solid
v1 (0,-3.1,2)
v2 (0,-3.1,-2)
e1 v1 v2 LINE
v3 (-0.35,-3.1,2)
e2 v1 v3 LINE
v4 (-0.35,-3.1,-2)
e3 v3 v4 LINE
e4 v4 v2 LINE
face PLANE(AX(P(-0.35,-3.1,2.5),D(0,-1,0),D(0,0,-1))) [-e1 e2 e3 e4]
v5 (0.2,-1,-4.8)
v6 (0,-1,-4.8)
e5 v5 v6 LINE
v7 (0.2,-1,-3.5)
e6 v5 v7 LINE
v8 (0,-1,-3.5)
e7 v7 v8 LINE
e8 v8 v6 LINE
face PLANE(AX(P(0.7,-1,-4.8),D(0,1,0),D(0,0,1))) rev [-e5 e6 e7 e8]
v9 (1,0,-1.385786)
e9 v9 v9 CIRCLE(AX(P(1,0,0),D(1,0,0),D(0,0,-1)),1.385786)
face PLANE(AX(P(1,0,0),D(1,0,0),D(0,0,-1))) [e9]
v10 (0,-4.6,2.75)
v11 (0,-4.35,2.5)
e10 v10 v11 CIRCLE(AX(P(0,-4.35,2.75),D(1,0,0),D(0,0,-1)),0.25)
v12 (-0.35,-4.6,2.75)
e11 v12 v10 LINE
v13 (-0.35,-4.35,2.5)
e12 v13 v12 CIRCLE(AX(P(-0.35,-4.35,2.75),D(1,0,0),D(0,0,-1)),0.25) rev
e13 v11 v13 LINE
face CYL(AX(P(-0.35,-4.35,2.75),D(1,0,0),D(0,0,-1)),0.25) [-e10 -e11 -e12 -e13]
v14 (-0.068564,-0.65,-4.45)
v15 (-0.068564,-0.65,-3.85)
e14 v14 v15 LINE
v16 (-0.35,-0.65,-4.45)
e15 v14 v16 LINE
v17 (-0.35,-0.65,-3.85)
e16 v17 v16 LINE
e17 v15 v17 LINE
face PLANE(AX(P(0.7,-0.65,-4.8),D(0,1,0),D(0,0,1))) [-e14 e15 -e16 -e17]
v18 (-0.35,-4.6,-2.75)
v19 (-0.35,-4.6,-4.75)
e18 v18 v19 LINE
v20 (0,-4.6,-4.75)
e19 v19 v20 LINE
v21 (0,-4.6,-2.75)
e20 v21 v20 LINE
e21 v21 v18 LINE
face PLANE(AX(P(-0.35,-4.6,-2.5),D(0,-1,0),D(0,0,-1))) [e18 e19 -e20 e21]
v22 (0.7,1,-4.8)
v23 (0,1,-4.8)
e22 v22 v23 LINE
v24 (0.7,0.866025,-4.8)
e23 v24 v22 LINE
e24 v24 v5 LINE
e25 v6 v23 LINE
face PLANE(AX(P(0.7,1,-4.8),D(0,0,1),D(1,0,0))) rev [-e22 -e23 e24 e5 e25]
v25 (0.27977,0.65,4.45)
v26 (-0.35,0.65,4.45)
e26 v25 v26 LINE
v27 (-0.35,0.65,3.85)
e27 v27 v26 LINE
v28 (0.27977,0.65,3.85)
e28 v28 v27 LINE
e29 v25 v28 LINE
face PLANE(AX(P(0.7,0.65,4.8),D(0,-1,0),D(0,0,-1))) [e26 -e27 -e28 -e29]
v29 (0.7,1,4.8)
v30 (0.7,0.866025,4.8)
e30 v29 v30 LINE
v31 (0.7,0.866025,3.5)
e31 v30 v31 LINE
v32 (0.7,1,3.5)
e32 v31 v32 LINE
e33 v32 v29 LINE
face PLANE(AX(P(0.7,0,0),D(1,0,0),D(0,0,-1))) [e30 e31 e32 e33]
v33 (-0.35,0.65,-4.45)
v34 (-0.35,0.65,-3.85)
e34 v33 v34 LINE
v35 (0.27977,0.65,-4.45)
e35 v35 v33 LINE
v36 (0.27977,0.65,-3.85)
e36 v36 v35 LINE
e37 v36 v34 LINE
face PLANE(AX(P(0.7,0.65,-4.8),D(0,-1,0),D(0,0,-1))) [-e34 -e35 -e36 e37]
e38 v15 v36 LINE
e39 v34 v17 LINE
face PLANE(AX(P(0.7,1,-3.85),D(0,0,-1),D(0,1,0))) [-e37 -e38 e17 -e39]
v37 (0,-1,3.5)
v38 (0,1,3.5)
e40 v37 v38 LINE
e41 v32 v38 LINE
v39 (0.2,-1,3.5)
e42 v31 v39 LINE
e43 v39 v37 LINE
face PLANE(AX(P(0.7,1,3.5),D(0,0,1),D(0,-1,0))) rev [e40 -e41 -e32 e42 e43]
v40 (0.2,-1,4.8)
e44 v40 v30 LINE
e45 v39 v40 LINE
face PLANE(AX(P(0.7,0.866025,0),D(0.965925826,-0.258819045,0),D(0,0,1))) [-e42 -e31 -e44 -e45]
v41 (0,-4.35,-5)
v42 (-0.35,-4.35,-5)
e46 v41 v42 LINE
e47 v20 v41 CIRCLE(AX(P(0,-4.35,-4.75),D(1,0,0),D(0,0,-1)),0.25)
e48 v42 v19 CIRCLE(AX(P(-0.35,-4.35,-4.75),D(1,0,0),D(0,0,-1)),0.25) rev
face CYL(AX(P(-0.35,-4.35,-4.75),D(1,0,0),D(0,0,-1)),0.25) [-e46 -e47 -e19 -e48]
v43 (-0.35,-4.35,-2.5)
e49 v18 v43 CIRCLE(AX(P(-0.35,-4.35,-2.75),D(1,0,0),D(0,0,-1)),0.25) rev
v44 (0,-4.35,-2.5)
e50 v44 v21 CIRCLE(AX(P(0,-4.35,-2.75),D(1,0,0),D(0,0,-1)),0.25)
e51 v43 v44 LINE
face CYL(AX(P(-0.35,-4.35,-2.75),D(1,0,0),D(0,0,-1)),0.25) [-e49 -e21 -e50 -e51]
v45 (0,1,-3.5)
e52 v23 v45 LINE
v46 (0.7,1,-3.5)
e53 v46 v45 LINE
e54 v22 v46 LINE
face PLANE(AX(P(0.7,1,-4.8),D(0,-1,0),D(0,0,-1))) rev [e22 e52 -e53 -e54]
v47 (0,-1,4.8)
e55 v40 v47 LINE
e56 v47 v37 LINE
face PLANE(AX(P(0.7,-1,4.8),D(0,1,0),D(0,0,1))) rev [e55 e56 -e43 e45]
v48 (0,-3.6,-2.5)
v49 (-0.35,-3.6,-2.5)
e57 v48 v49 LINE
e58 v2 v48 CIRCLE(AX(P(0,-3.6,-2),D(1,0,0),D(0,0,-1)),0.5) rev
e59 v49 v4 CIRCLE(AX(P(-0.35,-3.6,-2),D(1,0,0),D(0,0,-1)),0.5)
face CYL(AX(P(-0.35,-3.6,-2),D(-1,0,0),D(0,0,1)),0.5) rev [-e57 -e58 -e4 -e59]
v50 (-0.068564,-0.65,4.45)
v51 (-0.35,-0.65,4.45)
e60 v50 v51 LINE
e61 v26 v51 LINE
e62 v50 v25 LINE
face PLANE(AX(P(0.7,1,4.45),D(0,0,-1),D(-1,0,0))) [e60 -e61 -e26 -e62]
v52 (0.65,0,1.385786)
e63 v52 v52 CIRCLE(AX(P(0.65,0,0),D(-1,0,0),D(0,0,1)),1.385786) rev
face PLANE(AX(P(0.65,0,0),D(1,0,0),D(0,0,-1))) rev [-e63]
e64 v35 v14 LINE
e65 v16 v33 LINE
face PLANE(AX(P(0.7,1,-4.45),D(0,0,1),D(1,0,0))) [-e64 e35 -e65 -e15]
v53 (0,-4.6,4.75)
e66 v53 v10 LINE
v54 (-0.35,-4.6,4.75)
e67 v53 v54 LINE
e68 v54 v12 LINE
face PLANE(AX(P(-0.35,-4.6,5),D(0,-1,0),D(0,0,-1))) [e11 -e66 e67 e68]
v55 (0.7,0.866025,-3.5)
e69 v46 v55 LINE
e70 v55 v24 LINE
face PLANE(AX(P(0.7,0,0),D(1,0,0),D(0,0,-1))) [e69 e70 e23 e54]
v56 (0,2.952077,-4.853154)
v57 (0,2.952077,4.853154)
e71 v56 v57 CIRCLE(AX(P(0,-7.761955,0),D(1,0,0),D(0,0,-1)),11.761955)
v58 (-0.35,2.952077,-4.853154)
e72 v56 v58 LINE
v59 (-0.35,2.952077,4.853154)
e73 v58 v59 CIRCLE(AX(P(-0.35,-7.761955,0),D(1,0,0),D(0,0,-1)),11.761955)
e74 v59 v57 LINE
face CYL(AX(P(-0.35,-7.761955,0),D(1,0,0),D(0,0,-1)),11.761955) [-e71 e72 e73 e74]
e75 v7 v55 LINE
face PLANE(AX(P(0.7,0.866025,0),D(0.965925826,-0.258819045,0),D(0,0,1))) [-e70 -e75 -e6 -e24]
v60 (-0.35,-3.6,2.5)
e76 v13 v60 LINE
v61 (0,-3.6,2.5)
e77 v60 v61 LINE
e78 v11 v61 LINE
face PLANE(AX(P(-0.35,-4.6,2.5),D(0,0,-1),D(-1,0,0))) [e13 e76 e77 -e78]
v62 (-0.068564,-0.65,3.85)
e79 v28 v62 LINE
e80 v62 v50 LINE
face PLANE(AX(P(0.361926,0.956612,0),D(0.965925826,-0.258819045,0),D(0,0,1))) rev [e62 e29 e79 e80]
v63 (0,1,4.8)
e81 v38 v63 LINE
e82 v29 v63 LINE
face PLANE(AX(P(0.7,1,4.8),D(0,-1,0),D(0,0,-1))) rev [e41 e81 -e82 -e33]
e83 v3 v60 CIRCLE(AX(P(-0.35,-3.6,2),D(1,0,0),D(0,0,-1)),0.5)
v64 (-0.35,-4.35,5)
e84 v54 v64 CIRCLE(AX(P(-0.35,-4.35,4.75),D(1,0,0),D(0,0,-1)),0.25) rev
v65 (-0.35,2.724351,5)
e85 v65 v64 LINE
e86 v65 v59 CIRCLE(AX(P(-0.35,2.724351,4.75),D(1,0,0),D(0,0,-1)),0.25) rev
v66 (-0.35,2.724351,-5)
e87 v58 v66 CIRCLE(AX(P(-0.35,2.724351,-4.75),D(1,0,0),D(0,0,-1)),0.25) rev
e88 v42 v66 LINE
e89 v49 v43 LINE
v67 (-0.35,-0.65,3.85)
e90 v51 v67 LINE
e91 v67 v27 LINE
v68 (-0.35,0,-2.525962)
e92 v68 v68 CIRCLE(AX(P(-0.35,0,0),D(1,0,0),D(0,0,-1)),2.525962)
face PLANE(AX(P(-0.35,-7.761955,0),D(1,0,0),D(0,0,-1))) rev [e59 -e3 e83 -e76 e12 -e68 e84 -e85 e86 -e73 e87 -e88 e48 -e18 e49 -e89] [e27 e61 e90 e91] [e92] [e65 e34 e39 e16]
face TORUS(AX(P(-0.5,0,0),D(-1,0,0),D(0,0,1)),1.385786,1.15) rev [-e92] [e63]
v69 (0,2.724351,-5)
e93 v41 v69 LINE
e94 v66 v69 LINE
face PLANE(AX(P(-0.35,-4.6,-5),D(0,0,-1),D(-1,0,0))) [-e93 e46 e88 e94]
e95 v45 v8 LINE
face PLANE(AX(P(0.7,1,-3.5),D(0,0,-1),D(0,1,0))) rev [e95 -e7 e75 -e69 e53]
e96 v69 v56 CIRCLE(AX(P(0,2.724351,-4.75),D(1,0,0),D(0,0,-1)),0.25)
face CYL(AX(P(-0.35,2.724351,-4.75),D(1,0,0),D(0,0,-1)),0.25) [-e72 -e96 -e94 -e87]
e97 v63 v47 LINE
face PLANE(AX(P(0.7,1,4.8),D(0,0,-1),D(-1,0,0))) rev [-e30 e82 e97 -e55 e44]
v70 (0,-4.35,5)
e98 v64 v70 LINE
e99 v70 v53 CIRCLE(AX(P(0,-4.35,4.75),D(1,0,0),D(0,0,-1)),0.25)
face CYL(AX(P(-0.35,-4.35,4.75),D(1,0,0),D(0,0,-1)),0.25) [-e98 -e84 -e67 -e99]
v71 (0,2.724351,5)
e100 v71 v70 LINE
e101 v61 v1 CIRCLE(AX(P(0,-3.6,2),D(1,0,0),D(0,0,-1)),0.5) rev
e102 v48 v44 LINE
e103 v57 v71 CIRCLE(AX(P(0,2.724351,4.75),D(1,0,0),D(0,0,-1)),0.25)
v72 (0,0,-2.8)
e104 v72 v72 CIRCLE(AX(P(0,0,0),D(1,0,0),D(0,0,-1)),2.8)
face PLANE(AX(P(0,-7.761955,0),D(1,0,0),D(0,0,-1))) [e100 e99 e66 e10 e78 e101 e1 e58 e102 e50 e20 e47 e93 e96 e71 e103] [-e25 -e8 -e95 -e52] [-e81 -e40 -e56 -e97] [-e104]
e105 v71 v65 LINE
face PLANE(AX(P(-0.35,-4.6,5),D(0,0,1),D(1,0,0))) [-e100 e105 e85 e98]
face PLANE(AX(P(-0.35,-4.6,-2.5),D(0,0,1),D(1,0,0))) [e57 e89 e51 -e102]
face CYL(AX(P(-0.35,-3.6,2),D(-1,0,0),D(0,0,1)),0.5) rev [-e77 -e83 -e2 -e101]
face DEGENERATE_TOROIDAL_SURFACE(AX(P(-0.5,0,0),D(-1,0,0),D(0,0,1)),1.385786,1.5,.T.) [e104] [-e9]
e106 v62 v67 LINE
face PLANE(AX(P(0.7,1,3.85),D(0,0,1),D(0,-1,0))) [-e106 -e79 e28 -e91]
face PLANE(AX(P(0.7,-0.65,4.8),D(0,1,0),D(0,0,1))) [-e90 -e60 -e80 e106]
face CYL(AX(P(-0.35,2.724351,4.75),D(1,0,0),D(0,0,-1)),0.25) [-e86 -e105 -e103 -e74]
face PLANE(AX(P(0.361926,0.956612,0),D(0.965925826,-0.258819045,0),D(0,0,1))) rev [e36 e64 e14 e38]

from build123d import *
from OCP.BRepFilletAPI import BRepFilletAPI_MakeChamfer

# Parameters (mm, degrees)
SKETCH1_R           = 2.8
BOSS_EXTRUDE1_DEPTH = 1
BOSS_EXTRUDE2_DEPTH = 0.35
FILLET1_R           = 1.5
SKETCH3_W           = 1.3
SKETCH3_H           = 2
BOSS_EXTRUDE3_DEPTH = 0.7
CHAMFER1_SIZE       = 0.5
CHAMFER1_SIZE2      = 1.866025404
FILLET2_R           = 0.5
FILLET3_R           = 0.25
SHELL3_START        = -4.45
SHELL3_DEPTH        = 0.6
SHELL3_START_2      = 3.85
SHELL3_2_DEPTH      = 0.6


# Read off the part's stored shape, not the designer's step: Shell3
with BuildPart() as part:
    # Sketch1 → Boss-Extrude1 (new body)
    with BuildSketch(Plane(origin=(0, 0, 0), x_dir=(0, 0, -1), z_dir=(1, 0, 0))):
        Circle(SKETCH1_R)
    extrude(amount=BOSS_EXTRUDE1_DEPTH)

    # Sketch2 → Boss-Extrude2 (add)
    with BuildSketch(Plane(origin=(0, 0, 0), x_dir=(0, 0, -1), z_dir=(1, 0, 0))):
        with BuildLine():
            Line((2.5, -4.6), (5, -4.6))
            Line((5, -4.6), (5, 2.495381949))
            Line((5, 2.495381949), (5, 2.884339454))
            ThreePointArc((5, 2.884339454), (0, 4), (-5, 2.884339454))
            Line((-5, 2.884339454), (-5, 2.495381949))
            Line((-5, 2.495381949), (-5, -4.6))
            Line((-5, -4.6), (-2.5, -4.6))
            Line((-2.5, -4.6), (-2.5, -3.1))
            Line((-2.5, -3.1), (2.5, -3.1))
            Line((2.5, -3.1), (2.5, -4.6))
        make_face()
    extrude(amount=-BOSS_EXTRUDE2_DEPTH)

    # Fillet1
    # the kernel refuses this fillet: 1.5 mm, written as the material it takes off along each edge
    with BuildSketch(Plane(origin=(1, 0, 0), x_dir=(0, 0, -1), z_dir=(0, -1, 0))) as fillet1_piece_1:
        with BuildLine():
            CenterArc((1.385786438, -1.5), FILLET1_R, 19.471220634, 70.528779366)
            Line((1.385786438, 0), (1.385786438, 0.03))
            Line((1.385786438, 0.03), (2.8, 0.03))
            Line((2.8, 0.03), (2.83, 0))
            ThreePointArc((2.83, 0), (2.83, -0.5), (2.828284271, -0.99))
            Line((2.828284271, -0.99), (2.8, -1))
        make_face()
    revolve(axis=Axis((1, 0, 0), (1, 0, 0)), mode=Mode.SUBTRACT)

    # Sketch3 → Boss-Extrude3 (add)
    with BuildSketch(Plane(origin=(0, 0, 0), x_dir=(0, 0, -1), z_dir=(1, 0, 0))):
        with Locations((-4.15, 0)):
            Rectangle(SKETCH3_W, SKETCH3_H)
        with Locations((4.15, 0)):
            Rectangle(SKETCH3_W, SKETCH3_H)
    extrude(amount=BOSS_EXTRUDE3_DEPTH)

    # Chamfer1: one chamfer whose edges measure the first distance from different faces: ONE call of the kernel's chamfer builder (chamfer() names one face for all edges)
    chamfer1_edges_1 = [part.edges().sort_by_distance(p)[0] for p in [
        (0.7, -1, 4.15),
    ]]
    chamfer1_side_1 = [part.faces().sort_by_distance(p)[0] for p in [
        (0.35, -1, 4.15),
    ]]
    chamfer1_edges_2 = [part.edges().sort_by_distance(p)[0] for p in [
        (0.7, -1, -4.15),
    ]]
    chamfer1_side_2 = [part.faces().sort_by_distance(p)[0] for p in [
        (0.35, -1, -4.15),
    ]]
    chamfer1 = BRepFilletAPI_MakeChamfer(part.part.solid().wrapped)
    for e in chamfer1_edges_1:
        chamfer1.Add(CHAMFER1_SIZE, CHAMFER1_SIZE2, e.wrapped, chamfer1_side_1[0].wrapped)  # the first distance lies on this face
    for e in chamfer1_edges_2:
        chamfer1.Add(CHAMFER1_SIZE, CHAMFER1_SIZE2, e.wrapped, chamfer1_side_2[0].wrapped)  # the first distance lies on this face
    add(Compound.cast(chamfer1.Shape()), mode=Mode.REPLACE)

    # Fillet2
    fillet2_edges = [part.edges().sort_by_distance(p)[0] for p in [
        (-0.175, -3.1, 2.5),
        (-0.175, -3.1, -2.5),
    ]]
    fillet(fillet2_edges, radius=FILLET2_R)

    # Fillet3
    fillet3_edges = [part.edges().sort_by_distance(p)[0] for p in [
        (-0.175, -4.6, 2.5),
        (-0.175, -4.6, 5),
        (-0.175, 2.884339454, 5),
        (-0.175, 2.884339454, -5),
        (-0.175, -4.6, -5),
        (-0.175, -4.6, -2.5),
    ]]
    fillet(fillet3_edges, radius=FILLET3_R)

    # Shell3 outline → Shell3 (cut)
    with BuildSketch(Plane.XY.offset(SHELL3_START)):
        Polygon((-0.35, -0.65), (-0.068564446, -0.65), (0.279769504, 0.65), (-0.35, 0.65), align=None)
    extrude(amount=SHELL3_DEPTH, mode=Mode.SUBTRACT)

    # Shell3 2 outline → Shell3 2 (cut)
    with BuildSketch(Plane.XY.offset(SHELL3_START_2)):
        Polygon((-0.35, -0.65), (-0.068564446, -0.65), (0.279769504, 0.65), (-0.35, 0.65), align=None)
    extrude(amount=SHELL3_2_DEPTH, mode=Mode.SUBTRACT)

    # Shell3 3 outline → Shell3 3 (revolve, cut)
    with BuildSketch(Plane.YX):
        with BuildLine():
            ThreePointArc((2.525961863, -0.35), (2.144073982, 0.364580823), (1.385786438, 0.65))
            Line((1.385786438, 0.65), (0, 0.65))
            Line((0, 0.65), (0, -0.35))
            Line((0, -0.35), (2.525961863, -0.35))
        make_face()
    revolve(axis=Axis((0, 0, 0), (1, 0, 0)), mode=Mode.SUBTRACT)


solid = part.part
